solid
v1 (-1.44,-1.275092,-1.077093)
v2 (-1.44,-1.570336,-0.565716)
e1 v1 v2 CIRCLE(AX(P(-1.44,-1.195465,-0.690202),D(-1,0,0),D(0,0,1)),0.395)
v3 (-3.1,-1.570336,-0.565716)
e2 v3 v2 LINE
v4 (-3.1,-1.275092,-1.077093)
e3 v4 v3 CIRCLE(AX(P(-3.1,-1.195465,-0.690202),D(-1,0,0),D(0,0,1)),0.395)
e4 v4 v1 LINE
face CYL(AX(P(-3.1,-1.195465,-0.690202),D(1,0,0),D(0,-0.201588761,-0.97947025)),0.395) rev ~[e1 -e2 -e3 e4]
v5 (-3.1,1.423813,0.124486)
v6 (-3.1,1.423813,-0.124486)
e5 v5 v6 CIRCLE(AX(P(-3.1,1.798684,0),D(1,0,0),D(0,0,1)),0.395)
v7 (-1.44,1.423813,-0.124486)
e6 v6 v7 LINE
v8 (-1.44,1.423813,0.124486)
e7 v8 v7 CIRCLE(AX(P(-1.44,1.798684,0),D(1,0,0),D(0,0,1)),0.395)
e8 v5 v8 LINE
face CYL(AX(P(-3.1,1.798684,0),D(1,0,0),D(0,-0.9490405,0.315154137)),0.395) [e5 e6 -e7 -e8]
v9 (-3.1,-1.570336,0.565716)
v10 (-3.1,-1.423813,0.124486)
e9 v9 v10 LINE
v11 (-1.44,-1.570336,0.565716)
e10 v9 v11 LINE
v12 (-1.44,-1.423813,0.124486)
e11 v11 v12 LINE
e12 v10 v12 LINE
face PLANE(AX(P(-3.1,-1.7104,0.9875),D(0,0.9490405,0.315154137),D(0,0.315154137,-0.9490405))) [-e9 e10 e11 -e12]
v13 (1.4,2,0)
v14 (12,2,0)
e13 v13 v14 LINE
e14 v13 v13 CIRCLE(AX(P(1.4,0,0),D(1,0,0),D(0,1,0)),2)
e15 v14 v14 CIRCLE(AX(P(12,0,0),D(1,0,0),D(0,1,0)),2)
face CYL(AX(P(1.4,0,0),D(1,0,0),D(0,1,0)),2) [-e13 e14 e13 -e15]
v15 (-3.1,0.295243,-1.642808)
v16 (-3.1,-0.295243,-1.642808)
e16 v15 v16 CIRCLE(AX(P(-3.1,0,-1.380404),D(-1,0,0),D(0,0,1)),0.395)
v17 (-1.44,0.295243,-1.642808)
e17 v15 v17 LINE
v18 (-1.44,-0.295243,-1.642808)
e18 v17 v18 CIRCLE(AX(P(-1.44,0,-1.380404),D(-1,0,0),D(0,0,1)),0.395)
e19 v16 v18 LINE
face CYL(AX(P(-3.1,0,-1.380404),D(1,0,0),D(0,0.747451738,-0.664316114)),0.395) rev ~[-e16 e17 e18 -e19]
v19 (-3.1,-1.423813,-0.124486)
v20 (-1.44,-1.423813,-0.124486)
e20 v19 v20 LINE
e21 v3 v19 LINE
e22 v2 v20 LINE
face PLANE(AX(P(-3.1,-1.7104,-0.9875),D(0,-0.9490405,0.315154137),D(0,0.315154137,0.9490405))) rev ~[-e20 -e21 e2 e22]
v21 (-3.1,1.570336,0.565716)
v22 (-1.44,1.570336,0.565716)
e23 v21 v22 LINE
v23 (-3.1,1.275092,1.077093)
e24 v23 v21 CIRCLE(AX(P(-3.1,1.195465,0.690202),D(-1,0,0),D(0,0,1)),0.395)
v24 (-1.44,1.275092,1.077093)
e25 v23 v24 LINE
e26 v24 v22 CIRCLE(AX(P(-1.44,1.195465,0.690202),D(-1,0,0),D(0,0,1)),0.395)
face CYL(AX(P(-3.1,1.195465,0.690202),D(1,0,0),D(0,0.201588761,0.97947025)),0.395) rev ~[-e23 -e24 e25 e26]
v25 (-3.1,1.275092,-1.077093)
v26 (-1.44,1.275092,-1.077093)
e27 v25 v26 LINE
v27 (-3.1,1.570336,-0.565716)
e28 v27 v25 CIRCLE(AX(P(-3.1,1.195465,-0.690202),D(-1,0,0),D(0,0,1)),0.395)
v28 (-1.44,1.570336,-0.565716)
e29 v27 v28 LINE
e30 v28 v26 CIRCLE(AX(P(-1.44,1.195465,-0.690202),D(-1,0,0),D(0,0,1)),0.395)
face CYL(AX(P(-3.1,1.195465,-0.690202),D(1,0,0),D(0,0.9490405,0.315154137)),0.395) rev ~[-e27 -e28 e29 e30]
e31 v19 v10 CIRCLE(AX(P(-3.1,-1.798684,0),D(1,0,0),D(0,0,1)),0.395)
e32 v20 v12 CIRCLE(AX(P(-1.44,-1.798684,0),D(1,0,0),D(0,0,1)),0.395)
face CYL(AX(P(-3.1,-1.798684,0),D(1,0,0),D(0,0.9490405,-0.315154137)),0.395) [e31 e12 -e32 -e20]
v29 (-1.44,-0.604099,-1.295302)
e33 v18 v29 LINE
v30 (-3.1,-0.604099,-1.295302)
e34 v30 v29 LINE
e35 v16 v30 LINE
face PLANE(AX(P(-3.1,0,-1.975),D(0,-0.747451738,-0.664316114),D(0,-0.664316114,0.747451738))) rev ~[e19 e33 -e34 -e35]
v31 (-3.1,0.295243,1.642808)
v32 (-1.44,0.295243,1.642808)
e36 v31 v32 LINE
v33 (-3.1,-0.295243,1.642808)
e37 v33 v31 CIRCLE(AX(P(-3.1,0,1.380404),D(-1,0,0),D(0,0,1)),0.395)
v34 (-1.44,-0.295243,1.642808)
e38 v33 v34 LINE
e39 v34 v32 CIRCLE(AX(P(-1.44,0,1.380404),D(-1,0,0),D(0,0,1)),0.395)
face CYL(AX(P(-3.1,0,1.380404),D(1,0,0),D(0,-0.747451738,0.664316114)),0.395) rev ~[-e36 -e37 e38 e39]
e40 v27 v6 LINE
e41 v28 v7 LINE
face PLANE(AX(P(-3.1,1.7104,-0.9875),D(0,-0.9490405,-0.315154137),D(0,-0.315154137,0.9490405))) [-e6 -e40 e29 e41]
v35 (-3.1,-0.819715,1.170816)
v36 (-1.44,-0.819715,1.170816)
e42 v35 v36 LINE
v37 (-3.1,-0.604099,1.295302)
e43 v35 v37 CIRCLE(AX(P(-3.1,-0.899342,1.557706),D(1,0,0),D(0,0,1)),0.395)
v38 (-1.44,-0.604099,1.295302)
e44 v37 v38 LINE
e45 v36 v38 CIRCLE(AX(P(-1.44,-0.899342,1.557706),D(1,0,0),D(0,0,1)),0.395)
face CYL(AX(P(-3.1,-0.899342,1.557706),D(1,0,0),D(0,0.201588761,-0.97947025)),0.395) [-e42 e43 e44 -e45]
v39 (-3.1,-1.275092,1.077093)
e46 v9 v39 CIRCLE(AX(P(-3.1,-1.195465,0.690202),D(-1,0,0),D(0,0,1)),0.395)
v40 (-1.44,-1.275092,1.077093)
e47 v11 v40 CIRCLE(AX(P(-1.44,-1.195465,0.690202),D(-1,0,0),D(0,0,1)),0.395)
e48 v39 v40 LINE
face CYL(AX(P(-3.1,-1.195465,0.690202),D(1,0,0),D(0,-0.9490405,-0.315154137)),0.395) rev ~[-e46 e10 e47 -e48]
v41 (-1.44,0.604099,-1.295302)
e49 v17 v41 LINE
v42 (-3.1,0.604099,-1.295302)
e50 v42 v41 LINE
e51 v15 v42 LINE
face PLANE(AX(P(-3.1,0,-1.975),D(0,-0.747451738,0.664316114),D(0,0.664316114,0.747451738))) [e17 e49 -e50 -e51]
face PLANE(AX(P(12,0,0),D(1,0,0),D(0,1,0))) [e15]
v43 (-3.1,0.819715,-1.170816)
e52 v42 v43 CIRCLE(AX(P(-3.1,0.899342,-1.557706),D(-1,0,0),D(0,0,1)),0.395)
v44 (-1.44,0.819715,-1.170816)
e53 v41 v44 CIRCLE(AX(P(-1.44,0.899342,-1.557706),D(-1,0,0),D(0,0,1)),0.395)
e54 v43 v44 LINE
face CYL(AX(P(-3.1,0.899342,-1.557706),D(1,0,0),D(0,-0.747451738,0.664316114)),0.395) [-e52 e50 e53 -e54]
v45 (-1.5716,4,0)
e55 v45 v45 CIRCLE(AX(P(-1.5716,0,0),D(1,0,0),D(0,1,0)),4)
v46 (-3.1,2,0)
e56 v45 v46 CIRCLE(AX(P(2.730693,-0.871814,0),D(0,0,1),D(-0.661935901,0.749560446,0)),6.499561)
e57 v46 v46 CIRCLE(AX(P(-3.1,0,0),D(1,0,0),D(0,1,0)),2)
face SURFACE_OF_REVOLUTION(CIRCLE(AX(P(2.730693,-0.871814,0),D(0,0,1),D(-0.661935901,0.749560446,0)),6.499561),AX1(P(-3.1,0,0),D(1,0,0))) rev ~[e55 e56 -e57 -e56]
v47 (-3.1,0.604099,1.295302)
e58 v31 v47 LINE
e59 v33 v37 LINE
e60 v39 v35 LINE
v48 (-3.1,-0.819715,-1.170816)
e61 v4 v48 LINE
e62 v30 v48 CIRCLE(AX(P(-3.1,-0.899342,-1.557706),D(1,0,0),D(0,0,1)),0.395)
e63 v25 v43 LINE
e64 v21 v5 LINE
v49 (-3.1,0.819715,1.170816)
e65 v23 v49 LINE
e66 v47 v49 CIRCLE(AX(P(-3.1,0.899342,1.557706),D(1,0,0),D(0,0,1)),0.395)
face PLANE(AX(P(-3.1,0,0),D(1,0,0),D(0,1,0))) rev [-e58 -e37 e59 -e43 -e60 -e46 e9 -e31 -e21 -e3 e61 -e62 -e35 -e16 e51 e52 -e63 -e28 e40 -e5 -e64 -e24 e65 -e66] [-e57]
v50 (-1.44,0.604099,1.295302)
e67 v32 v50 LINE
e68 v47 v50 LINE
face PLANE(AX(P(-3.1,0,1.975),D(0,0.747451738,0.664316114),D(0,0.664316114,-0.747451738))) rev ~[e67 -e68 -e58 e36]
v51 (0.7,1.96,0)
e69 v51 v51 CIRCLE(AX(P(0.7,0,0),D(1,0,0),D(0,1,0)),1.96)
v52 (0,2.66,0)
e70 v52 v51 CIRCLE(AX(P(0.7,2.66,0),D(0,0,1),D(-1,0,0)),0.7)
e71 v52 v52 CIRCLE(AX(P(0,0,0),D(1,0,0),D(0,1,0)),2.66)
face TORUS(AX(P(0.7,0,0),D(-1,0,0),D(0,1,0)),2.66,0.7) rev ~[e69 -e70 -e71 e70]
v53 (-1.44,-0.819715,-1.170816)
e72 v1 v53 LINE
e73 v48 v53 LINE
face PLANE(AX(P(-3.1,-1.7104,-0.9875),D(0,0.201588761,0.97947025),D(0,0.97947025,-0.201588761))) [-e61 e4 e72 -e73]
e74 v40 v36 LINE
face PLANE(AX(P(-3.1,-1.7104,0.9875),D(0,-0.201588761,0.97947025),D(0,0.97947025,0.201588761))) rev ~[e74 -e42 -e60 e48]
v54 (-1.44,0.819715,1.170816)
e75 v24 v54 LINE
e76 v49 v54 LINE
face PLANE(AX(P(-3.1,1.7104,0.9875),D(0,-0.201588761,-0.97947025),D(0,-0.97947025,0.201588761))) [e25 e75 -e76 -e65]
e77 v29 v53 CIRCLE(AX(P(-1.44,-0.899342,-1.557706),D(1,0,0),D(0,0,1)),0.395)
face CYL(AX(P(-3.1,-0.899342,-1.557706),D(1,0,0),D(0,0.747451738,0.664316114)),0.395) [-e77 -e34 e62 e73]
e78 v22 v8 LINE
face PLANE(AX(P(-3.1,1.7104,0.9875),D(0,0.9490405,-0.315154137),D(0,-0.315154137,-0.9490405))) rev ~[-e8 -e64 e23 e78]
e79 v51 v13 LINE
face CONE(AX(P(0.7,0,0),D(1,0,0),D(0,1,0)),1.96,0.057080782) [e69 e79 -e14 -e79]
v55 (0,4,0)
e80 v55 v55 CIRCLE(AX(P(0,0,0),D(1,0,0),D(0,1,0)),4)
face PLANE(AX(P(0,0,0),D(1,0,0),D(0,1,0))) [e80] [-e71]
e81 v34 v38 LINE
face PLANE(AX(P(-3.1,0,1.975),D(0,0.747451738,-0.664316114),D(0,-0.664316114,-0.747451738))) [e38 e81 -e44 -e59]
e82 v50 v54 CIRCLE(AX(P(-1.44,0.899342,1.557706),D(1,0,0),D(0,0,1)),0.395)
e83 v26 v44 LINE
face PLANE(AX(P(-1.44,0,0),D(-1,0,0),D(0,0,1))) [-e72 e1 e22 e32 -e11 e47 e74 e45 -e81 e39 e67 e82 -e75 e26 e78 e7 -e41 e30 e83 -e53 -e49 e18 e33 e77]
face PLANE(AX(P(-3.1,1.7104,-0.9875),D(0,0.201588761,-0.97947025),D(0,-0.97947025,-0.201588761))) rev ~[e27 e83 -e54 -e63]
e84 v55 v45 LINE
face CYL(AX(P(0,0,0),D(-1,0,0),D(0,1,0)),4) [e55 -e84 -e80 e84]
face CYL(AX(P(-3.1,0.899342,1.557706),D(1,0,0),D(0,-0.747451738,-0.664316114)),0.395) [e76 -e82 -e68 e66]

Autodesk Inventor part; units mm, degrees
ref_plane "YZ Plane" through (0, 0, 0) normal (1, 0, 0) x (0, 1, 0)
ref_plane "XZ Plane" through (0, 0, 0) normal (0, 1, 0) x (-1, 0, 0)
ref_plane "XY Plane" through (0, 0, 0) normal (0, 0, 1) x (1, 0, 0)
sketch "Sketch4" plane through (0, 0, 0) normal (0, 0, 1) x (1, 0, 0)
  line L0 (-3.1, 0) -> (12, 0)
  line L1 (0, 0) -> (-3.1, 0)
  line L2 (0, 4) -> (0, 2.66)
  line L3 (0.7, 1.96) -> (0.7, 1.96)
  line L4 (0.7, 1.96) -> (1.4, 2)
  arc A0 (0, 2.66) -> (0.7, 1.96) centre (0.7, 2.66) ccw
  line L5 (-3.1, 0) -> (-3.1, 2)
  line L6 (0, 4) -> (-1.5716, 4)
  arc A1 (-1.5716, 4) -> (-3.1, 2) centre (2.731, -0.8721) ccw
  line L7 (1.4, 2) -> (12, 2)
  line L8 (12, 2) -> (12, 0)
  point P0 (0, 1.96)
  dimension "d71" = 0.7
  dimension "d72" = 12
  dimension "d74" = 0.7
  dimension "d75" = 3.92
  dimension "d78" = 4
  dimension "d82" = 6.5
  dimension "d83" = 3.1
  dimension "d84" = 8
  dimension "d104" = 10.6
  dimension "d105" = 4
revolve "Revolution7" add sketch "Sketch4" angle 360 about axis through (-3.1, 0, 0) along (1, 0, 0)
sketch "Sketch5" plane through (-3.1, 0, 0) normal (-1, 0, 0) x (0, 0, 1)
  circle A0 centre (0, 0) radius 1.975 construction
  circle A1 centre (0, 0) radius 1.3825 construction
  line L0 (0, 0) -> (-1.1973, 0.6912)
  line L1 (0, 0) -> (-1.1973, -0.6912)
  line L2 (-1.8008, 0) -> (1.7887, 0)
  line L3 (-1.975, 0) -> (-1.1973, -0.6912)
  line L4 (-1.975, 0) -> (-1.1973, 0.6912)
  point P0 (0, 0)
  dimension "d88" = 3.95
  dimension "d89" = 2.765
  dimension "d90" = 30
  dimension "d91" = 30
extrude "Extrusion1" cut sketch "Sketch5" against normal blind 1.66
pattern_circular "Circular Pattern1" count 6 over 360 about axis through (-10, 0, 0) along (1, 0, 0) of "Extrusion1"
fillet "Fillet1" radius 0.395 12 edges at (-2.27, -1.7104, -0.9875) (-2.27, -0.6912, -1.1973) (-2.27, -1.3825, 0) (-2.27, -1.7104, 0.9875) (-2.27, -0.6912, 1.1973) (-2.27, 0, 1.975) (-2.27, 1.3825, 0) (-2.27, 1.7104, 0.9875) (-2.27, 0.6913, 1.1973) (-2.27, 0.6912, -1.1973) (-2.27, 0, -1.975) (-2.27, 1.7104, -0.9875)
thread "Thread7" size "M4x0.7" class "6g" standard "ISO Metric profile" length 10.6
equation "\"a\" = 1.4"
equation "\"b\" = 10.6"
equation "\"dk\" = 8"
equation "\"k\" = 3.1"
equation "\"r\" = 0.7"
equation "\"rf\" = 6.5"
equation "\"x\" = 0.7"
equation "\"A_\" = 3.95"
equation "\"t\" = 1.66"
equation "\"p\" = 0.7"
equation "\"l_\" = 12"
equation "\"d\" = 4"
equation "\"ds_\" = 3.92"
equation "\"lg\" = 0"
properties part number "Flachkopfschraube mit Innenrund ISO 14583 - M4 x 12 - A3-70" material "Edelstahl"
